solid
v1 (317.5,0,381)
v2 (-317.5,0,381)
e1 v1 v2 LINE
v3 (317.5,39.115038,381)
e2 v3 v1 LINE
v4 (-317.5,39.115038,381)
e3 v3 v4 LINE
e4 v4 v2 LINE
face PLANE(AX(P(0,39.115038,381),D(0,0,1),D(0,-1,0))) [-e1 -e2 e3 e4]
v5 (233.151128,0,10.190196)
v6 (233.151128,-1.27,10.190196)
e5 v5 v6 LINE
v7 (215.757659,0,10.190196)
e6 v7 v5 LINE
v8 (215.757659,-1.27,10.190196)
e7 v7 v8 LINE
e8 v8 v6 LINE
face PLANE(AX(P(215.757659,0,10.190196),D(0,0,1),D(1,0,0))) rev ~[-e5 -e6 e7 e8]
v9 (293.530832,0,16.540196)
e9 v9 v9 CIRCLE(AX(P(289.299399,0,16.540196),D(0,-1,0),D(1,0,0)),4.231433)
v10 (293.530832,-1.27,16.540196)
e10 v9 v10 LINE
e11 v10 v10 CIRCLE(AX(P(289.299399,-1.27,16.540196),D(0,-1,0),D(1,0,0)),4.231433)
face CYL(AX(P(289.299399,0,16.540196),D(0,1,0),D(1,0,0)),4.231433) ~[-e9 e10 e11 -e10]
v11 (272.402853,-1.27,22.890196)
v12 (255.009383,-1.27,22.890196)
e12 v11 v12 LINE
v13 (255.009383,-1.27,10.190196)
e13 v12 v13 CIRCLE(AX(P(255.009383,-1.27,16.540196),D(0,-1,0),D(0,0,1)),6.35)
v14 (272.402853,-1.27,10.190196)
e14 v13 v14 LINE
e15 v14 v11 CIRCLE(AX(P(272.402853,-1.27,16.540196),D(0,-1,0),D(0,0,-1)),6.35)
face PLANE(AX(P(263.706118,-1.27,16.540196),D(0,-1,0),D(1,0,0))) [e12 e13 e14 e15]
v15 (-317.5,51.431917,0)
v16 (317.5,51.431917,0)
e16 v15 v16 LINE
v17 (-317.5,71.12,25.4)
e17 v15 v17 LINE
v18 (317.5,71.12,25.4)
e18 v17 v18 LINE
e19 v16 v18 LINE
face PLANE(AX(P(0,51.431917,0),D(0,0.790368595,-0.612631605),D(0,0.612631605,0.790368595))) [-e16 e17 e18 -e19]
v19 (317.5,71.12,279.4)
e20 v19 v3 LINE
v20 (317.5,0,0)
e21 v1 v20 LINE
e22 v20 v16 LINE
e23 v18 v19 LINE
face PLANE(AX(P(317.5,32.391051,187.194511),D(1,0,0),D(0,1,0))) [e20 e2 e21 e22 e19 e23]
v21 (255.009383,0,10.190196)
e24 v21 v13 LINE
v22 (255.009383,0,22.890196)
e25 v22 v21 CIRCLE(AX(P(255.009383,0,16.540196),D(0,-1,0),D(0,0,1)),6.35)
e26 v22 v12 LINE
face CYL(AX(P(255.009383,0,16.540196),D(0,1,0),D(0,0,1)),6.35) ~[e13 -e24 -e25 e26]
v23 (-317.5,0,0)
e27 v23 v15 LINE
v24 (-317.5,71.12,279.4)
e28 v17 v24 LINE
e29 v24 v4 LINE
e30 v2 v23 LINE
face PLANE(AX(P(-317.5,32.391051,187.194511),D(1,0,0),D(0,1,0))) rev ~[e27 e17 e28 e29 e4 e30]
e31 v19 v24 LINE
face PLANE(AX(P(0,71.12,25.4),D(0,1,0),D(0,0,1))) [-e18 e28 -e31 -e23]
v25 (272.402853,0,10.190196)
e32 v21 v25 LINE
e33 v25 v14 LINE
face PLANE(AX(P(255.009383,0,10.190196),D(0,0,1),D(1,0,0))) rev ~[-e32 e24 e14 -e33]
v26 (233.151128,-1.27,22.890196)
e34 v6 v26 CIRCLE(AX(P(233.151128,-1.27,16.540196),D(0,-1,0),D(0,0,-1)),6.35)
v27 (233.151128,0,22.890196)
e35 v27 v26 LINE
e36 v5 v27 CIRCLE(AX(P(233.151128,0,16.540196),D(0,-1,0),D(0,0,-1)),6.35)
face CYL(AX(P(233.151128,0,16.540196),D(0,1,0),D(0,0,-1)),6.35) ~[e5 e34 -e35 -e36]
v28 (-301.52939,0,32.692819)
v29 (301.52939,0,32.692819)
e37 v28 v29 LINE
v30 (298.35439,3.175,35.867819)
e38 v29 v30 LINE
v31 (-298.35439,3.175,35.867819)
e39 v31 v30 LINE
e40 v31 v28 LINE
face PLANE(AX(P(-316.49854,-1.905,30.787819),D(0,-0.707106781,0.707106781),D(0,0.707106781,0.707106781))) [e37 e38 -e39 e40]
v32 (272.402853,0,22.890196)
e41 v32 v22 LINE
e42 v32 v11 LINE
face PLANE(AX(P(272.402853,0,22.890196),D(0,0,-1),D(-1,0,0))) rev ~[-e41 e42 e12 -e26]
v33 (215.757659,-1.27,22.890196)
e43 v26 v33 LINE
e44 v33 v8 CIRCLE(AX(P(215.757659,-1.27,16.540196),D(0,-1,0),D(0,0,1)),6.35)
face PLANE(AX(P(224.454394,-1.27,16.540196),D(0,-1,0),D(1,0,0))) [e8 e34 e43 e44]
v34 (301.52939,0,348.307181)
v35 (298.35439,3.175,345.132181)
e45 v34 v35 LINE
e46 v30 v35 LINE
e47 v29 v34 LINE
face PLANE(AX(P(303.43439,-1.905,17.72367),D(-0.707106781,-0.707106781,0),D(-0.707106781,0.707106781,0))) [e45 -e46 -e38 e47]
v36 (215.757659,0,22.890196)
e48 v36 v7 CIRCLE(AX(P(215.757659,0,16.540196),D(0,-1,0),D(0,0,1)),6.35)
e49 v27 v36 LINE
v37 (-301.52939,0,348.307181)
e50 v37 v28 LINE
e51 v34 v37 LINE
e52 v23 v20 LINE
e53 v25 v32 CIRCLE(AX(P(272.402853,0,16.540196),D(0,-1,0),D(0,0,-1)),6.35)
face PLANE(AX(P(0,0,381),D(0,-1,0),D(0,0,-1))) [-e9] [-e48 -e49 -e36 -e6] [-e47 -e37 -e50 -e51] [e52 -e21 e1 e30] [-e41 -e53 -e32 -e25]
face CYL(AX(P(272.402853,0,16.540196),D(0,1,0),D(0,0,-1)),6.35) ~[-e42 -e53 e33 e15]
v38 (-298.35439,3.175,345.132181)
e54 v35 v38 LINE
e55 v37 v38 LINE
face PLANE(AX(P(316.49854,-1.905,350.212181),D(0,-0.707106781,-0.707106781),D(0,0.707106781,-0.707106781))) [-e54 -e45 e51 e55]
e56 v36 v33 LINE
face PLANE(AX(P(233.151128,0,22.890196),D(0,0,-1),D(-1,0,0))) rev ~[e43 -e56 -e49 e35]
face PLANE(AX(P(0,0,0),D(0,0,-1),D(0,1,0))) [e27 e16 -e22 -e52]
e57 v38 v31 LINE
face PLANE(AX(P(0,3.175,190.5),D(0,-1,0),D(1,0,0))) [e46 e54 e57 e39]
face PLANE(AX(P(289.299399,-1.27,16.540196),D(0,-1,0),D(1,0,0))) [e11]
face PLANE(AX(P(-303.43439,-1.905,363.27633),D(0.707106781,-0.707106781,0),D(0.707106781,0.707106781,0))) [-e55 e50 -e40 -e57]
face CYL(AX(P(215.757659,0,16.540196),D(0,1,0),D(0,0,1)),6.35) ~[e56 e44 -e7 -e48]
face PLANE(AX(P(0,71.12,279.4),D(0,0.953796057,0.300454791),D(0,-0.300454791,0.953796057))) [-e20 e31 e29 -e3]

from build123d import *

# Parameters (mm, degrees)
F1_DEPTH     = 317.5
F2_W         = 606.8687809474
F2_H         = 319.4243614871
F3_DEPTH     = 3.175
F4_T4_DEPTH  = 345.5526606448
F4_T9_DEPTH  = 632.9970801051
F4_T14_DEPTH = 345.5526606448
F4_T19_DEPTH = 632.9970801051
F5_R         = 4.2314330569
F6_DEPTH     = 1.27


# Not quite as in the source:
# - a fillet or chamfer that OpenCascade refuses, or shapes differently, is made with other operations: its cross-section is extruded or revolved along the edge and cut away or added


with BuildPart() as f1:
    # F0 (on Right) → F1 (new body, symmetric)
    with BuildSketch(Plane.YZ):
        Polygon((0, 381), (0, 0), (51.4319166541, 0), (71.12, 25.4), (71.12, 279.4), (39.1150377691, 381), align=None)
    extrude(amount=F1_DEPTH, both=True)

    # F2 (on face) → F3 (cut)
    with BuildSketch(Plane.XZ):
        with Locations((0, 190.5)):
            Rectangle(F2_W, F2_H)
    extrude(amount=-F3_DEPTH, mode=Mode.SUBTRACT)

    # F4: chamfer of 5.08 on 4 edges, made by hand


with BuildPart() as f4_tool2:
    # F4_s3 → F4_t4 (new body)
    with BuildSketch(Plane.XY.offset(363.2763303224)):
        Polygon((-303.4343904737, -1.905), (-298.3543904737, 3.175), (-303.4343904737, 3.175), align=None)
    extrude(amount=-F4_T4_DEPTH)

    split(bisect_by=Plane.XZ, keep=Keep.BOTTOM)


with BuildPart() as f1_1:
    add(f1.part)

    # F4_t1: union F4_tool2
    add(f4_tool2.part)


with BuildPart() as f4_tool7:
    # F4_s8 → F4_t9 (new body)
    with BuildSketch(Plane.YZ.offset(316.4985400526)):
        Polygon((-1.905, 350.2121807435), (3.175, 345.1321807435), (3.175, 350.2121807435), align=None)
    extrude(amount=-F4_T9_DEPTH)

    split(bisect_by=Plane.XZ, keep=Keep.BOTTOM)


with BuildPart() as f1_2:
    add(f1_1.part)

    # F4_t6: union F4_tool7
    add(f4_tool7.part)


with BuildPart() as f4_tool12:
    # F4_s13 → F4_t14 (new body)
    with BuildSketch(Plane.XY.offset(17.7236696776)):
        Polygon((303.4343904737, -1.905), (298.3543904737, 3.175), (303.4343904737, 3.175), align=None)
    extrude(amount=F4_T14_DEPTH)

    split(bisect_by=Plane.XZ, keep=Keep.BOTTOM)


with BuildPart() as f1_3:
    add(f1_2.part)

    # F4_t11: union F4_tool12
    add(f4_tool12.part)


with BuildPart() as f4_tool17:
    # F4_s18 → F4_t19 (new body)
    with BuildSketch(Plane.YZ.offset(-316.4985400526)):
        Polygon((-1.905, 30.7878192565), (3.175, 35.8678192565), (3.175, 30.7878192565), align=None)
    extrude(amount=F4_T19_DEPTH)

    split(bisect_by=Plane.XZ, keep=Keep.BOTTOM)


with BuildPart() as f1_4:
    add(f1_3.part)

    # F4_t16: union F4_tool17
    add(f4_tool17.part)

    # F5 (on face) → F6 (join)
    with BuildSketch(Plane.XZ):
        with BuildLine():
            ThreePointArc((233.1511284661, 10.1901956652), (239.5011284661, 16.5401956652), (233.1511284661, 22.8901956652))
            Line((233.1511284661, 22.8901956652), (215.7576586556, 22.8901956652))
            ThreePointArc((215.7576586556, 22.8901956652), (209.4076586556, 16.5401956652), (215.7576586556, 10.1901956652))
            Line((215.7576586556, 10.1901956652), (233.1511284661, 10.1901956652))
        make_face()
        with BuildLine():
            ThreePointArc((272.4028527737, 10.1901956652), (278.7528527737, 16.5401956652), (272.4028527737, 22.8901956652))
            Line((272.4028527737, 22.8901956652), (255.0093829632, 22.8901956652))
            ThreePointArc((255.0093829632, 22.8901956652), (248.6593829632, 16.5401956652), (255.0093829632, 10.1901956652))
            Line((255.0093829632, 10.1901956652), (272.4028527737, 10.1901956652))
        make_face()
        with Locations((289.2993986607, 16.5401956652)):
            Circle(F5_R)
    extrude(amount=F6_DEPTH)


solid = f1_4.part
